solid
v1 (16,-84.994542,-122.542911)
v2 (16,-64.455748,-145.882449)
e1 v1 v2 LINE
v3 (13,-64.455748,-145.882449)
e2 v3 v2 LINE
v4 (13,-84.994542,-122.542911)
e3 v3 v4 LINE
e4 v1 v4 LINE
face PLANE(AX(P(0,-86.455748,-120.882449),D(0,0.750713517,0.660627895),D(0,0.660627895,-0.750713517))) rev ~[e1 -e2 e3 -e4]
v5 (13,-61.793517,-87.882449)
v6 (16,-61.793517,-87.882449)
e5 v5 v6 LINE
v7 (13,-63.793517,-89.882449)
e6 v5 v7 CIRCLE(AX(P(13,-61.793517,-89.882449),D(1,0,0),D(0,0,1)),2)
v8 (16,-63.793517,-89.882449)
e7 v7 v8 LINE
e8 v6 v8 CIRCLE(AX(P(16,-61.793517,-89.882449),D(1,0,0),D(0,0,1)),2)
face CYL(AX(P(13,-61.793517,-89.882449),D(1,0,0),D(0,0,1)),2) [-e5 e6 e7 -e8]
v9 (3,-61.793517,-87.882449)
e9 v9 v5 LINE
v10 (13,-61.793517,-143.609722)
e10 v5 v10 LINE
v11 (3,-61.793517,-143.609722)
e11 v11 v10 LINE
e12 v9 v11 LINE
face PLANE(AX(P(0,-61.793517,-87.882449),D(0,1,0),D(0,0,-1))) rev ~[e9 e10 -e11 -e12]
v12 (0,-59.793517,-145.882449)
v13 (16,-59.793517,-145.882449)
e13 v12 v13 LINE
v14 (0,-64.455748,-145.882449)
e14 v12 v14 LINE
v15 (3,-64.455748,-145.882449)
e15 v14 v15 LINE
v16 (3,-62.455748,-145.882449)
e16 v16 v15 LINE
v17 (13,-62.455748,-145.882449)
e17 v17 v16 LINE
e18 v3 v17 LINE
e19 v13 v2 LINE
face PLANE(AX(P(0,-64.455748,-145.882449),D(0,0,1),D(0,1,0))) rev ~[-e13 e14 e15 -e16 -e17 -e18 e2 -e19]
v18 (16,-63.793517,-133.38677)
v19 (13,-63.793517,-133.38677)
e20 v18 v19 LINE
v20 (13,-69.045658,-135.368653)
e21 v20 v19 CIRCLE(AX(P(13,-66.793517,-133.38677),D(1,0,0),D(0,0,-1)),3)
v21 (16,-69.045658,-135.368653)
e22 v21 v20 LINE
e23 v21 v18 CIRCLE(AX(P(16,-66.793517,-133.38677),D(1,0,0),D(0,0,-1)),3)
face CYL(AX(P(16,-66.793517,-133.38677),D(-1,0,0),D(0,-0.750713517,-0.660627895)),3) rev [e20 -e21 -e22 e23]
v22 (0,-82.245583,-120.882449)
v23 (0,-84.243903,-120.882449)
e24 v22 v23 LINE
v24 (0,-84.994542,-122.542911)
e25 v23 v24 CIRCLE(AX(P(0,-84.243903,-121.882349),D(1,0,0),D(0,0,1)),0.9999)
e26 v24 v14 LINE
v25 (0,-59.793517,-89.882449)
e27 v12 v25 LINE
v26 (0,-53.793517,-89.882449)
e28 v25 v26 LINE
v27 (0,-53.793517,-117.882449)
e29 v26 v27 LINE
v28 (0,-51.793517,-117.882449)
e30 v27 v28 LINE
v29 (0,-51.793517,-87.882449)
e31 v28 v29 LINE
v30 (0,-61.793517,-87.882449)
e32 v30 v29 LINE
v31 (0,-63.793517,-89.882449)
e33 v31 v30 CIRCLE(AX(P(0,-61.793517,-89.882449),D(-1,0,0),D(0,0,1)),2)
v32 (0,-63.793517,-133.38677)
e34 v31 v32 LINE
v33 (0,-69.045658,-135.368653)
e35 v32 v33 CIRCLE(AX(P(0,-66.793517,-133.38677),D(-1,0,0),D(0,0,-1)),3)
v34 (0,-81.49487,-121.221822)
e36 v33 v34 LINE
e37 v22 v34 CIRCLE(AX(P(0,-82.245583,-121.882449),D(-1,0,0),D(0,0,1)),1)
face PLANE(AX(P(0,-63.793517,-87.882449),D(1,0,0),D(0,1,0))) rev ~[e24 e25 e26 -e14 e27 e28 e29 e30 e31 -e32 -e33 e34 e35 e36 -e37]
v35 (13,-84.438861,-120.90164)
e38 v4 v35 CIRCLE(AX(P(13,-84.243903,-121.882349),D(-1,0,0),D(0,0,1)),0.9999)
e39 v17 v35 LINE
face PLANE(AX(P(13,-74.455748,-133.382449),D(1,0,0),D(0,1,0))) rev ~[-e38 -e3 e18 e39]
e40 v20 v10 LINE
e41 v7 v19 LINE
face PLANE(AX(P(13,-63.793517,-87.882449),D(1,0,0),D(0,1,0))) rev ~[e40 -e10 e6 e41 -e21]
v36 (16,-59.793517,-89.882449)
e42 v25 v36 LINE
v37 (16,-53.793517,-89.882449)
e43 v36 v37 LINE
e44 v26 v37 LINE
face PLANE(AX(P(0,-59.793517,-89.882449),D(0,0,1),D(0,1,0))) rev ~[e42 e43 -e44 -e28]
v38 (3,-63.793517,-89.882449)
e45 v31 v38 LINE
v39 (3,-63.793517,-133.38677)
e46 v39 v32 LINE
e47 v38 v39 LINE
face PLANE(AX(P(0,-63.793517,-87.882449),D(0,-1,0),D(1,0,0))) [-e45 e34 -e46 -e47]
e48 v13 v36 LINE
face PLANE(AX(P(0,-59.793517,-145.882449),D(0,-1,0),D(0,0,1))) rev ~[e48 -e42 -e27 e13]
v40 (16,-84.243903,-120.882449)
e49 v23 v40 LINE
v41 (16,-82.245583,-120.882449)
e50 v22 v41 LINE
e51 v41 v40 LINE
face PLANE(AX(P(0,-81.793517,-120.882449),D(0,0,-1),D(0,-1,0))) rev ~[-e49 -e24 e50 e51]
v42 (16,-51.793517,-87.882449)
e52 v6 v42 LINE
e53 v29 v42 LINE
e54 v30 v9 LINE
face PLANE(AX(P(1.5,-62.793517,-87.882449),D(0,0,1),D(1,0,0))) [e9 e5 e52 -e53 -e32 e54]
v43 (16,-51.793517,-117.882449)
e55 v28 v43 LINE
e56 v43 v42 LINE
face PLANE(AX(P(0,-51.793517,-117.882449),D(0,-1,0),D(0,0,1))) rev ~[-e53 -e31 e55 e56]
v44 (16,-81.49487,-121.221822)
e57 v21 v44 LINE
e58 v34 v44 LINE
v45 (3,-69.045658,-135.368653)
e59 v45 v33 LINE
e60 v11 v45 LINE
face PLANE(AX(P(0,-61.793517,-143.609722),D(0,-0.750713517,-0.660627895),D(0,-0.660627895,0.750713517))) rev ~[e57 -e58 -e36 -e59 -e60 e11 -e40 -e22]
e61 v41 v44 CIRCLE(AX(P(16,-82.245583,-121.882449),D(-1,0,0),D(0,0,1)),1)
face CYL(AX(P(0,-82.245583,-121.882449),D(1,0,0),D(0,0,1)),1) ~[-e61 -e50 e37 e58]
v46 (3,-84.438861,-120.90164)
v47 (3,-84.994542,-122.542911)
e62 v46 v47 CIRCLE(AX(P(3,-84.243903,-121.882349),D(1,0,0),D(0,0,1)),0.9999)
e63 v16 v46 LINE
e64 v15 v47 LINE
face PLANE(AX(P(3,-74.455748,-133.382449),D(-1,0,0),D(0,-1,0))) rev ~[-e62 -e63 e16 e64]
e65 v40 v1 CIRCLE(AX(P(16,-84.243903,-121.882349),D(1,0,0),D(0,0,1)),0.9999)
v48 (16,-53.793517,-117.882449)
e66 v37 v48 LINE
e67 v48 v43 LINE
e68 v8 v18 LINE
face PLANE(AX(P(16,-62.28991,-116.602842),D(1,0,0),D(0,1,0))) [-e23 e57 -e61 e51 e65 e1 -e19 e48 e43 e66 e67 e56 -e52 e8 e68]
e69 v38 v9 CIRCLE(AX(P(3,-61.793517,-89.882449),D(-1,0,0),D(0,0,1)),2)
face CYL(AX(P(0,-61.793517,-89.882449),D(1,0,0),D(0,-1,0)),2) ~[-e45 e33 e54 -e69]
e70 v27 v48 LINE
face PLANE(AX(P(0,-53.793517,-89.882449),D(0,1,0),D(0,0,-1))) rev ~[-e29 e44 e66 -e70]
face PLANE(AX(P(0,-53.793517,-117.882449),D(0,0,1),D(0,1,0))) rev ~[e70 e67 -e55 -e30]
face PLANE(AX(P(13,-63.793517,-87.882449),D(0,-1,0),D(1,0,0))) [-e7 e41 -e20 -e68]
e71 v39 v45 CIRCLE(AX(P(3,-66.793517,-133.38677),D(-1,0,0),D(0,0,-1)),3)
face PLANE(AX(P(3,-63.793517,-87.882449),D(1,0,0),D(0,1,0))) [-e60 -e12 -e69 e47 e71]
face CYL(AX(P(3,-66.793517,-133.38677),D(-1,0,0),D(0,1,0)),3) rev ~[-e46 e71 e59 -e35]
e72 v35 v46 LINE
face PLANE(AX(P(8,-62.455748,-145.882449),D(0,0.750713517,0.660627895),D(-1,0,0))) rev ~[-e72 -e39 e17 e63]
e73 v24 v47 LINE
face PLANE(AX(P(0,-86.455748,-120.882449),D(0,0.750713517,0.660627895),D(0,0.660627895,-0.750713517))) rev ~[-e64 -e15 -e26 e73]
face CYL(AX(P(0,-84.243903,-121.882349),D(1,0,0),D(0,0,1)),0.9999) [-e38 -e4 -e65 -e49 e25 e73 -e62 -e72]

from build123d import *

# Parameters (mm, degrees)
F1_DEPTH = 16
F2_W     = 3
F2_H     = 2
F3_DEPTH = 58
F4_W     = 10
F4_H     = 2
F6_F1_R  = 0.9999
F7_R     = 1
F8_R     = 2
F9_R     = 3


# Not quite as in the source:
# - a fillet or chamfer is up to 0.001 mm smaller than in the source, because OpenCascade refuses the exact size


with BuildPart() as f1:
    # F0 (on Right) → F1 (new body)
    with BuildSketch(Plane.YZ):
        Polygon((-61.7935170661, -87.8824494406), (-61.7935170661, -143.6097221679), (-81.7935170661, -120.8824494406), (-86.4557482916, -120.8824494406), (-64.4557482916, -145.8824494406), (-59.7935170661, -145.8824494406), (-59.7935170661, -89.8824494406), (-53.7935170661, -89.8824494406), (-53.7935170661, -117.8824494406), (-51.7935170661, -117.8824494406), (-51.7935170661, -87.8824494406), align=None)
    extrude(amount=F1_DEPTH)

    # F2 (on face) → F3 (join)
    with BuildSketch(Plane.XY.offset(-87.8824494406)):
        with Locations((1.5, -62.7935170661)):
            Rectangle(F2_W, F2_H)
        with Locations((14.5, -62.7935170661)):
            Rectangle(F2_W, F2_H)
    extrude(amount=-F3_DEPTH)

    # F5: sweep along a path in F5_path
    with BuildLine(Plane(origin=(16, -64.4557482916, -145.8824494406), x_dir=(0, 0.6606278949, -0.7507135169), z_dir=(0, 0.7507135169, 0.6606278949))) as f5_path:
        Line((0, 0), (-33.3016516107, 0))
    # F4 (on face) → F5 (sweep, cut)
    with BuildSketch(Plane.XY.offset(-120.8824494406)):
        with Locations((8, -85.4557482916)):
            Rectangle(F4_W, F4_H)
    sweep(path=f5_path.line, mode=Mode.SUBTRACT)

    # F6: fillet of radius 1 on 2 edges, made by hand

    # F6_f1 (radius 1 in the source; OpenCascade refuses exactly that, so slightly less here)
    f6_f1_edges = [f1.edges().sort_by_distance(p)[0] for p in [
        (1.5, -86.4557482916, -120.8824494406),
    ]]
    fillet(f6_f1_edges, radius=F6_F1_R)

    # F7
    f7_edges = [f1.edges().sort_by_distance(p)[0] for p in [
        (8, -81.793517, -120.882449),
    ]]
    fillet(f7_edges, radius=F7_R)

    # F8
    f8_edges = [f1.edges().sort_by_distance(p)[0] for p in [
        (14.5, -63.793517, -87.882449),
        (1.5, -63.793517, -87.882449),
    ]]
    fillet(f8_edges, radius=F8_R)

    # F9
    f9_edges = [f1.edges().sort_by_distance(p)[0] for p in [
        (14.5, -63.793517, -141.336995),
        (1.5, -63.793517, -141.336995),
    ]]
    fillet(f9_edges, radius=F9_R)


solid = f1.part
